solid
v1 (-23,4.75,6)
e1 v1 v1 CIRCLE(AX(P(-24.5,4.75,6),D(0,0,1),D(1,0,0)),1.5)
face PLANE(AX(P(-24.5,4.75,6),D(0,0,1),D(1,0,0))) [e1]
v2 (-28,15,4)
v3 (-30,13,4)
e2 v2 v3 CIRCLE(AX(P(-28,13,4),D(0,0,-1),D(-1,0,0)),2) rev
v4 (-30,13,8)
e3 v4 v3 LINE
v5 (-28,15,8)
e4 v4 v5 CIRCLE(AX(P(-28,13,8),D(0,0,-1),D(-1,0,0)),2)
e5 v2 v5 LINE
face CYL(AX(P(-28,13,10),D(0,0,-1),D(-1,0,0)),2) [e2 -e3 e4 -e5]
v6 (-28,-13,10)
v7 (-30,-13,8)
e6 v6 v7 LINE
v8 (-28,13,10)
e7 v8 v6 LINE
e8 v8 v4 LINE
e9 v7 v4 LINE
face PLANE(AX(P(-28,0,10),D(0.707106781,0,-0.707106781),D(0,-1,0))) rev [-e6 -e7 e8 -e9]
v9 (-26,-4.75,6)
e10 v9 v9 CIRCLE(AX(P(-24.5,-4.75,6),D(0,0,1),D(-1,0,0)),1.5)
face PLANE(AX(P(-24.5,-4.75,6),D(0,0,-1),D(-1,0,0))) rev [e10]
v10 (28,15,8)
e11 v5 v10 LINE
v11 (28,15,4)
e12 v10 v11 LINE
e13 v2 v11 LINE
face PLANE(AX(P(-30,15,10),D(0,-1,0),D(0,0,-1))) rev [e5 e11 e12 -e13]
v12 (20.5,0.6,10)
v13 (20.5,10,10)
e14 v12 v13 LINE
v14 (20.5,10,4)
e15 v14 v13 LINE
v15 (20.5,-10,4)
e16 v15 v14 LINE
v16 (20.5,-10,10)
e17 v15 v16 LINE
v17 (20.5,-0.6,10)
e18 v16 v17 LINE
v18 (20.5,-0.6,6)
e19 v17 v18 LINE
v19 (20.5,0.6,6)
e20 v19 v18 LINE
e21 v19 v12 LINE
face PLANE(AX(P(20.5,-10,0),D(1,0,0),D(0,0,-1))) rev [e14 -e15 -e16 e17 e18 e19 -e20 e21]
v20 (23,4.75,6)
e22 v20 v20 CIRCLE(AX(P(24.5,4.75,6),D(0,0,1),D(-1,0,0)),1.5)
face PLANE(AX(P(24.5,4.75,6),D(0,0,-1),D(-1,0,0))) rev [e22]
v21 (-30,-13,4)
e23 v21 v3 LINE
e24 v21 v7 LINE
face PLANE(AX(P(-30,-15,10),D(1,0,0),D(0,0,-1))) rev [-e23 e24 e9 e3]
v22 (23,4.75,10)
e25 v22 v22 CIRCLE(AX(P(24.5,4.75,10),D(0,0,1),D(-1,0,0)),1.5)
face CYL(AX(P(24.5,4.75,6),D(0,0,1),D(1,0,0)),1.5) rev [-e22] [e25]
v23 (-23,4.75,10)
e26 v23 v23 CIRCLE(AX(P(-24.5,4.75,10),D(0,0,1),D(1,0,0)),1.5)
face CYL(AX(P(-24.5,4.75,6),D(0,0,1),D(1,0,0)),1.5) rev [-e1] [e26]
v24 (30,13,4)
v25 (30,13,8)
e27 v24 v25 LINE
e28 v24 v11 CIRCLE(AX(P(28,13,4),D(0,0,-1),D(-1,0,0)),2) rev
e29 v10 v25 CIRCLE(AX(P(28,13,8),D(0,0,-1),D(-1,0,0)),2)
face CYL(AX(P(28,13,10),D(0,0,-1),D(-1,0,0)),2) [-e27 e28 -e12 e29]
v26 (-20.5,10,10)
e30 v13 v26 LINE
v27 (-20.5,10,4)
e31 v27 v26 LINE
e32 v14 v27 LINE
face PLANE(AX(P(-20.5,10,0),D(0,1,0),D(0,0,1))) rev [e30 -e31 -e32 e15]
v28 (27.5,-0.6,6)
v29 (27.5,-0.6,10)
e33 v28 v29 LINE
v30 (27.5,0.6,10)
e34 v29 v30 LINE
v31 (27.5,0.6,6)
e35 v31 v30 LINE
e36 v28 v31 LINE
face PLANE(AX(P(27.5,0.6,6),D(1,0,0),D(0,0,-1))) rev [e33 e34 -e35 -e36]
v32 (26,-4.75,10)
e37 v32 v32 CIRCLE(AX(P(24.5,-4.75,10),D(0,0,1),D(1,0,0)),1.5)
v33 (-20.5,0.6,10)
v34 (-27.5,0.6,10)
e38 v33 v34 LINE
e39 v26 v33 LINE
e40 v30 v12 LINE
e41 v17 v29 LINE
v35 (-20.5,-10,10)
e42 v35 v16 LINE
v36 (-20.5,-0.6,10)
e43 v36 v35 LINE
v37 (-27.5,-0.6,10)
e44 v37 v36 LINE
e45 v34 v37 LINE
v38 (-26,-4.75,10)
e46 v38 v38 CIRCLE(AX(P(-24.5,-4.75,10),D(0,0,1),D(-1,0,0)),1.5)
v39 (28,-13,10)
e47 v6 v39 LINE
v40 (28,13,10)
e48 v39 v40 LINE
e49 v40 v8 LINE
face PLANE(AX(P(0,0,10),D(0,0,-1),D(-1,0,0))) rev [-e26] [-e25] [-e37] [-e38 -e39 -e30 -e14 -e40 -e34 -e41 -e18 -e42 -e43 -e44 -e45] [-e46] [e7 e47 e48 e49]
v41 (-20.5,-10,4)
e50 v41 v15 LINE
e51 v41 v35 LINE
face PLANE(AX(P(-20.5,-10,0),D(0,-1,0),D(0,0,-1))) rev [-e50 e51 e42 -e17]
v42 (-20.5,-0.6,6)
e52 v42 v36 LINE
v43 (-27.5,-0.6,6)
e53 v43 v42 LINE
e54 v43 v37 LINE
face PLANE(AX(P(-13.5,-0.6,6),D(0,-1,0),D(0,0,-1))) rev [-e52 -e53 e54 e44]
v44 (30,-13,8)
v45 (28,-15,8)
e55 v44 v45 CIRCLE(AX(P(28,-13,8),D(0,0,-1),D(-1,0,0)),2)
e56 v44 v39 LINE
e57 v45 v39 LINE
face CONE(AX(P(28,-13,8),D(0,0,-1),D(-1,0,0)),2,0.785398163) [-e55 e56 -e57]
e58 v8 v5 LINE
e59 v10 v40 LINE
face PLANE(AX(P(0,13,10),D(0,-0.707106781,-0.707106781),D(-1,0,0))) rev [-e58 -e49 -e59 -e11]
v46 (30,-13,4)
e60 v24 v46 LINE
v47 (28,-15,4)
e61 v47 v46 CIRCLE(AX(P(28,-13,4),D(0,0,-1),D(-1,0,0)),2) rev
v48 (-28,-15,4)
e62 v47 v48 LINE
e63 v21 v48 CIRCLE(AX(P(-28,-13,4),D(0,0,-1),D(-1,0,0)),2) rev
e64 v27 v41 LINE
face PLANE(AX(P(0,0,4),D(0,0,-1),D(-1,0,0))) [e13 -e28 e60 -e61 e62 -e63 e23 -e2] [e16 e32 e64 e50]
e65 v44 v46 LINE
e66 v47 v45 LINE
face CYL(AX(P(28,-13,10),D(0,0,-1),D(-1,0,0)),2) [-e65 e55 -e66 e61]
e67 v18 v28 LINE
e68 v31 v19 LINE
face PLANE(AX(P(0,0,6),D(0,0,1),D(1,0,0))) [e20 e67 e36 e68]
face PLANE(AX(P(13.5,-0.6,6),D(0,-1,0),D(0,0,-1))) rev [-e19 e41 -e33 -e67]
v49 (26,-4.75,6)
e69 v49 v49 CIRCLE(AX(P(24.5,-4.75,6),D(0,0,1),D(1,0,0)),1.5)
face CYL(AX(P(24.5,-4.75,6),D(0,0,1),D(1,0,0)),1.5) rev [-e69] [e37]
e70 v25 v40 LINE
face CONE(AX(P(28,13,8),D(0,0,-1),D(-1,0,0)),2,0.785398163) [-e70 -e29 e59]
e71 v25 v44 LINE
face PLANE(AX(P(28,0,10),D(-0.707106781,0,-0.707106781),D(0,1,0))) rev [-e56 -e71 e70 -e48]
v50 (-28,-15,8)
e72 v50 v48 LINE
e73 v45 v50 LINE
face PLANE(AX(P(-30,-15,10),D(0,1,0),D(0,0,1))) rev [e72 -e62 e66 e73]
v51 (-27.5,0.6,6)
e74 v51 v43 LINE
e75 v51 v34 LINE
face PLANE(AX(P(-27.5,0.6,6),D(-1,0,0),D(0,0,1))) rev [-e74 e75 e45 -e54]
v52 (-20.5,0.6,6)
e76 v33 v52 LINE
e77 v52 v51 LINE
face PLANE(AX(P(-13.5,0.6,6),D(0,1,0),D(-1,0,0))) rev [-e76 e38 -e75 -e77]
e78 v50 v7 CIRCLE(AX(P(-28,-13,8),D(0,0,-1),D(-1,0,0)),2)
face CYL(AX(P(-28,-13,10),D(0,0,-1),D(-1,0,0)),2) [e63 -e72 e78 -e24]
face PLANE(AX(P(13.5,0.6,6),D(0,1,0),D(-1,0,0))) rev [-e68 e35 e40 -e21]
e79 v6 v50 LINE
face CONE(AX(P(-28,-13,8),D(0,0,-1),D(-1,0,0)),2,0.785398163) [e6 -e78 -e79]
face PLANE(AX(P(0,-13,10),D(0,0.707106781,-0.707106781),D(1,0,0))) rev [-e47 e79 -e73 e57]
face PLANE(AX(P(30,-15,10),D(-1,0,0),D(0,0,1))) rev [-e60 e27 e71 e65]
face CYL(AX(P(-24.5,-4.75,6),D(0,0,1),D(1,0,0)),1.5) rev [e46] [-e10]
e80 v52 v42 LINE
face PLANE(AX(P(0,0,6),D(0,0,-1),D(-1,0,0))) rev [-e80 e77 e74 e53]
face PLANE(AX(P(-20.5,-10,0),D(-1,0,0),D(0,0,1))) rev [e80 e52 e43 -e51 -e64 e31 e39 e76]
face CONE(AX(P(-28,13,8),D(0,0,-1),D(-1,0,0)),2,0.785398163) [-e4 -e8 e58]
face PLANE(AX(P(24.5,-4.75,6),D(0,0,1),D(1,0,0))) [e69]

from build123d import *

# Parameters (mm, degrees)
SKETCH1_W           = 60
SKETCH1_H           = 30
BOSS_EXTRUDE1_DEPTH = 10
SKETCH2_W           = 41
SKETCH2_H           = 20
CUT_EXTRUDE1_DEPTH  = 10
SKETCH3_R           = 1.5
SKETCH3_W           = 14
SKETCH3_H           = 1.2
CUT_EXTRUDE2_DEPTH  = 4
FILLET1_R           = 2
CHAMFER1_SIZE       = 2
SKETCH5_W           = 145.508726569
SKETCH5_H           = 79.029504781
CUT_EXTRUDE3_DEPTH  = 4


with BuildPart() as part:
    # Sketch1 → Boss-Extrude1 (new body)
    with BuildSketch(Plane.XY):
        Rectangle(SKETCH1_W, SKETCH1_H)
    extrude(amount=BOSS_EXTRUDE1_DEPTH)

    # Sketch2 → Cut-Extrude1 (cut)
    with BuildSketch(Plane.XY.offset(10)):
        Rectangle(SKETCH2_W, SKETCH2_H)
    extrude(amount=-CUT_EXTRUDE1_DEPTH, mode=Mode.SUBTRACT)

    # Sketch3 → Cut-Extrude2 (cut)
    with BuildSketch(Plane.XY.offset(10)):
        with Locations((-24.5, 4.75)):
            Circle(SKETCH3_R)
        with Locations(Location((-24.5, -4.75, 0), (0, 0, 180))):
            Circle(SKETCH3_R)
        with Locations((24.5, -4.75)):
            Circle(SKETCH3_R)
        with Locations(Location((24.5, 4.75, 0), (0, 0, 180))):
            Circle(SKETCH3_R)
        with Locations((-20.5, 0)):
            Rectangle(SKETCH3_W, SKETCH3_H)
        with Locations((20.5, 0)):
            Rectangle(SKETCH3_W, SKETCH3_H)
    extrude(amount=-CUT_EXTRUDE2_DEPTH, mode=Mode.SUBTRACT)

    # Fillet1
    fillet1_edges = [part.edges().sort_by_distance(p)[0] for p in [
        (30, -15, 5),
        (-30, -15, 5),
        (-30, 15, 5),
        (30, 15, 5),
    ]]
    fillet(fillet1_edges, radius=FILLET1_R)

    # Chamfer1
    chamfer1_edges = [part.edges().sort_by_distance(p)[0] for p in [
        (0, 15, 10),
        (30, 0, 10),
        (-30, 0, 10),
        (0, -15, 10),
        (-29.414213562, 14.414213562, 10),
        (-29.414213562, -14.414213562, 10),
        (29.414213562, -14.414213562, 10),
        (29.414213562, 14.414213562, 10),
    ]]
    chamfer(chamfer1_edges, length=CHAMFER1_SIZE - 0.0001)  # a hair under: the kernel refuses the full size

    # Sketch5 → Cut-Extrude3 (cut)
    with BuildSketch(Plane(origin=(0, 0, 0), x_dir=(-1, 0, 0), z_dir=(0, 0, -1))):
        with Locations((-37.961499545, 20.658262846)):
            Rectangle(SKETCH5_W, SKETCH5_H)
    extrude(amount=-CUT_EXTRUDE3_DEPTH, mode=Mode.SUBTRACT)


solid = part.part
